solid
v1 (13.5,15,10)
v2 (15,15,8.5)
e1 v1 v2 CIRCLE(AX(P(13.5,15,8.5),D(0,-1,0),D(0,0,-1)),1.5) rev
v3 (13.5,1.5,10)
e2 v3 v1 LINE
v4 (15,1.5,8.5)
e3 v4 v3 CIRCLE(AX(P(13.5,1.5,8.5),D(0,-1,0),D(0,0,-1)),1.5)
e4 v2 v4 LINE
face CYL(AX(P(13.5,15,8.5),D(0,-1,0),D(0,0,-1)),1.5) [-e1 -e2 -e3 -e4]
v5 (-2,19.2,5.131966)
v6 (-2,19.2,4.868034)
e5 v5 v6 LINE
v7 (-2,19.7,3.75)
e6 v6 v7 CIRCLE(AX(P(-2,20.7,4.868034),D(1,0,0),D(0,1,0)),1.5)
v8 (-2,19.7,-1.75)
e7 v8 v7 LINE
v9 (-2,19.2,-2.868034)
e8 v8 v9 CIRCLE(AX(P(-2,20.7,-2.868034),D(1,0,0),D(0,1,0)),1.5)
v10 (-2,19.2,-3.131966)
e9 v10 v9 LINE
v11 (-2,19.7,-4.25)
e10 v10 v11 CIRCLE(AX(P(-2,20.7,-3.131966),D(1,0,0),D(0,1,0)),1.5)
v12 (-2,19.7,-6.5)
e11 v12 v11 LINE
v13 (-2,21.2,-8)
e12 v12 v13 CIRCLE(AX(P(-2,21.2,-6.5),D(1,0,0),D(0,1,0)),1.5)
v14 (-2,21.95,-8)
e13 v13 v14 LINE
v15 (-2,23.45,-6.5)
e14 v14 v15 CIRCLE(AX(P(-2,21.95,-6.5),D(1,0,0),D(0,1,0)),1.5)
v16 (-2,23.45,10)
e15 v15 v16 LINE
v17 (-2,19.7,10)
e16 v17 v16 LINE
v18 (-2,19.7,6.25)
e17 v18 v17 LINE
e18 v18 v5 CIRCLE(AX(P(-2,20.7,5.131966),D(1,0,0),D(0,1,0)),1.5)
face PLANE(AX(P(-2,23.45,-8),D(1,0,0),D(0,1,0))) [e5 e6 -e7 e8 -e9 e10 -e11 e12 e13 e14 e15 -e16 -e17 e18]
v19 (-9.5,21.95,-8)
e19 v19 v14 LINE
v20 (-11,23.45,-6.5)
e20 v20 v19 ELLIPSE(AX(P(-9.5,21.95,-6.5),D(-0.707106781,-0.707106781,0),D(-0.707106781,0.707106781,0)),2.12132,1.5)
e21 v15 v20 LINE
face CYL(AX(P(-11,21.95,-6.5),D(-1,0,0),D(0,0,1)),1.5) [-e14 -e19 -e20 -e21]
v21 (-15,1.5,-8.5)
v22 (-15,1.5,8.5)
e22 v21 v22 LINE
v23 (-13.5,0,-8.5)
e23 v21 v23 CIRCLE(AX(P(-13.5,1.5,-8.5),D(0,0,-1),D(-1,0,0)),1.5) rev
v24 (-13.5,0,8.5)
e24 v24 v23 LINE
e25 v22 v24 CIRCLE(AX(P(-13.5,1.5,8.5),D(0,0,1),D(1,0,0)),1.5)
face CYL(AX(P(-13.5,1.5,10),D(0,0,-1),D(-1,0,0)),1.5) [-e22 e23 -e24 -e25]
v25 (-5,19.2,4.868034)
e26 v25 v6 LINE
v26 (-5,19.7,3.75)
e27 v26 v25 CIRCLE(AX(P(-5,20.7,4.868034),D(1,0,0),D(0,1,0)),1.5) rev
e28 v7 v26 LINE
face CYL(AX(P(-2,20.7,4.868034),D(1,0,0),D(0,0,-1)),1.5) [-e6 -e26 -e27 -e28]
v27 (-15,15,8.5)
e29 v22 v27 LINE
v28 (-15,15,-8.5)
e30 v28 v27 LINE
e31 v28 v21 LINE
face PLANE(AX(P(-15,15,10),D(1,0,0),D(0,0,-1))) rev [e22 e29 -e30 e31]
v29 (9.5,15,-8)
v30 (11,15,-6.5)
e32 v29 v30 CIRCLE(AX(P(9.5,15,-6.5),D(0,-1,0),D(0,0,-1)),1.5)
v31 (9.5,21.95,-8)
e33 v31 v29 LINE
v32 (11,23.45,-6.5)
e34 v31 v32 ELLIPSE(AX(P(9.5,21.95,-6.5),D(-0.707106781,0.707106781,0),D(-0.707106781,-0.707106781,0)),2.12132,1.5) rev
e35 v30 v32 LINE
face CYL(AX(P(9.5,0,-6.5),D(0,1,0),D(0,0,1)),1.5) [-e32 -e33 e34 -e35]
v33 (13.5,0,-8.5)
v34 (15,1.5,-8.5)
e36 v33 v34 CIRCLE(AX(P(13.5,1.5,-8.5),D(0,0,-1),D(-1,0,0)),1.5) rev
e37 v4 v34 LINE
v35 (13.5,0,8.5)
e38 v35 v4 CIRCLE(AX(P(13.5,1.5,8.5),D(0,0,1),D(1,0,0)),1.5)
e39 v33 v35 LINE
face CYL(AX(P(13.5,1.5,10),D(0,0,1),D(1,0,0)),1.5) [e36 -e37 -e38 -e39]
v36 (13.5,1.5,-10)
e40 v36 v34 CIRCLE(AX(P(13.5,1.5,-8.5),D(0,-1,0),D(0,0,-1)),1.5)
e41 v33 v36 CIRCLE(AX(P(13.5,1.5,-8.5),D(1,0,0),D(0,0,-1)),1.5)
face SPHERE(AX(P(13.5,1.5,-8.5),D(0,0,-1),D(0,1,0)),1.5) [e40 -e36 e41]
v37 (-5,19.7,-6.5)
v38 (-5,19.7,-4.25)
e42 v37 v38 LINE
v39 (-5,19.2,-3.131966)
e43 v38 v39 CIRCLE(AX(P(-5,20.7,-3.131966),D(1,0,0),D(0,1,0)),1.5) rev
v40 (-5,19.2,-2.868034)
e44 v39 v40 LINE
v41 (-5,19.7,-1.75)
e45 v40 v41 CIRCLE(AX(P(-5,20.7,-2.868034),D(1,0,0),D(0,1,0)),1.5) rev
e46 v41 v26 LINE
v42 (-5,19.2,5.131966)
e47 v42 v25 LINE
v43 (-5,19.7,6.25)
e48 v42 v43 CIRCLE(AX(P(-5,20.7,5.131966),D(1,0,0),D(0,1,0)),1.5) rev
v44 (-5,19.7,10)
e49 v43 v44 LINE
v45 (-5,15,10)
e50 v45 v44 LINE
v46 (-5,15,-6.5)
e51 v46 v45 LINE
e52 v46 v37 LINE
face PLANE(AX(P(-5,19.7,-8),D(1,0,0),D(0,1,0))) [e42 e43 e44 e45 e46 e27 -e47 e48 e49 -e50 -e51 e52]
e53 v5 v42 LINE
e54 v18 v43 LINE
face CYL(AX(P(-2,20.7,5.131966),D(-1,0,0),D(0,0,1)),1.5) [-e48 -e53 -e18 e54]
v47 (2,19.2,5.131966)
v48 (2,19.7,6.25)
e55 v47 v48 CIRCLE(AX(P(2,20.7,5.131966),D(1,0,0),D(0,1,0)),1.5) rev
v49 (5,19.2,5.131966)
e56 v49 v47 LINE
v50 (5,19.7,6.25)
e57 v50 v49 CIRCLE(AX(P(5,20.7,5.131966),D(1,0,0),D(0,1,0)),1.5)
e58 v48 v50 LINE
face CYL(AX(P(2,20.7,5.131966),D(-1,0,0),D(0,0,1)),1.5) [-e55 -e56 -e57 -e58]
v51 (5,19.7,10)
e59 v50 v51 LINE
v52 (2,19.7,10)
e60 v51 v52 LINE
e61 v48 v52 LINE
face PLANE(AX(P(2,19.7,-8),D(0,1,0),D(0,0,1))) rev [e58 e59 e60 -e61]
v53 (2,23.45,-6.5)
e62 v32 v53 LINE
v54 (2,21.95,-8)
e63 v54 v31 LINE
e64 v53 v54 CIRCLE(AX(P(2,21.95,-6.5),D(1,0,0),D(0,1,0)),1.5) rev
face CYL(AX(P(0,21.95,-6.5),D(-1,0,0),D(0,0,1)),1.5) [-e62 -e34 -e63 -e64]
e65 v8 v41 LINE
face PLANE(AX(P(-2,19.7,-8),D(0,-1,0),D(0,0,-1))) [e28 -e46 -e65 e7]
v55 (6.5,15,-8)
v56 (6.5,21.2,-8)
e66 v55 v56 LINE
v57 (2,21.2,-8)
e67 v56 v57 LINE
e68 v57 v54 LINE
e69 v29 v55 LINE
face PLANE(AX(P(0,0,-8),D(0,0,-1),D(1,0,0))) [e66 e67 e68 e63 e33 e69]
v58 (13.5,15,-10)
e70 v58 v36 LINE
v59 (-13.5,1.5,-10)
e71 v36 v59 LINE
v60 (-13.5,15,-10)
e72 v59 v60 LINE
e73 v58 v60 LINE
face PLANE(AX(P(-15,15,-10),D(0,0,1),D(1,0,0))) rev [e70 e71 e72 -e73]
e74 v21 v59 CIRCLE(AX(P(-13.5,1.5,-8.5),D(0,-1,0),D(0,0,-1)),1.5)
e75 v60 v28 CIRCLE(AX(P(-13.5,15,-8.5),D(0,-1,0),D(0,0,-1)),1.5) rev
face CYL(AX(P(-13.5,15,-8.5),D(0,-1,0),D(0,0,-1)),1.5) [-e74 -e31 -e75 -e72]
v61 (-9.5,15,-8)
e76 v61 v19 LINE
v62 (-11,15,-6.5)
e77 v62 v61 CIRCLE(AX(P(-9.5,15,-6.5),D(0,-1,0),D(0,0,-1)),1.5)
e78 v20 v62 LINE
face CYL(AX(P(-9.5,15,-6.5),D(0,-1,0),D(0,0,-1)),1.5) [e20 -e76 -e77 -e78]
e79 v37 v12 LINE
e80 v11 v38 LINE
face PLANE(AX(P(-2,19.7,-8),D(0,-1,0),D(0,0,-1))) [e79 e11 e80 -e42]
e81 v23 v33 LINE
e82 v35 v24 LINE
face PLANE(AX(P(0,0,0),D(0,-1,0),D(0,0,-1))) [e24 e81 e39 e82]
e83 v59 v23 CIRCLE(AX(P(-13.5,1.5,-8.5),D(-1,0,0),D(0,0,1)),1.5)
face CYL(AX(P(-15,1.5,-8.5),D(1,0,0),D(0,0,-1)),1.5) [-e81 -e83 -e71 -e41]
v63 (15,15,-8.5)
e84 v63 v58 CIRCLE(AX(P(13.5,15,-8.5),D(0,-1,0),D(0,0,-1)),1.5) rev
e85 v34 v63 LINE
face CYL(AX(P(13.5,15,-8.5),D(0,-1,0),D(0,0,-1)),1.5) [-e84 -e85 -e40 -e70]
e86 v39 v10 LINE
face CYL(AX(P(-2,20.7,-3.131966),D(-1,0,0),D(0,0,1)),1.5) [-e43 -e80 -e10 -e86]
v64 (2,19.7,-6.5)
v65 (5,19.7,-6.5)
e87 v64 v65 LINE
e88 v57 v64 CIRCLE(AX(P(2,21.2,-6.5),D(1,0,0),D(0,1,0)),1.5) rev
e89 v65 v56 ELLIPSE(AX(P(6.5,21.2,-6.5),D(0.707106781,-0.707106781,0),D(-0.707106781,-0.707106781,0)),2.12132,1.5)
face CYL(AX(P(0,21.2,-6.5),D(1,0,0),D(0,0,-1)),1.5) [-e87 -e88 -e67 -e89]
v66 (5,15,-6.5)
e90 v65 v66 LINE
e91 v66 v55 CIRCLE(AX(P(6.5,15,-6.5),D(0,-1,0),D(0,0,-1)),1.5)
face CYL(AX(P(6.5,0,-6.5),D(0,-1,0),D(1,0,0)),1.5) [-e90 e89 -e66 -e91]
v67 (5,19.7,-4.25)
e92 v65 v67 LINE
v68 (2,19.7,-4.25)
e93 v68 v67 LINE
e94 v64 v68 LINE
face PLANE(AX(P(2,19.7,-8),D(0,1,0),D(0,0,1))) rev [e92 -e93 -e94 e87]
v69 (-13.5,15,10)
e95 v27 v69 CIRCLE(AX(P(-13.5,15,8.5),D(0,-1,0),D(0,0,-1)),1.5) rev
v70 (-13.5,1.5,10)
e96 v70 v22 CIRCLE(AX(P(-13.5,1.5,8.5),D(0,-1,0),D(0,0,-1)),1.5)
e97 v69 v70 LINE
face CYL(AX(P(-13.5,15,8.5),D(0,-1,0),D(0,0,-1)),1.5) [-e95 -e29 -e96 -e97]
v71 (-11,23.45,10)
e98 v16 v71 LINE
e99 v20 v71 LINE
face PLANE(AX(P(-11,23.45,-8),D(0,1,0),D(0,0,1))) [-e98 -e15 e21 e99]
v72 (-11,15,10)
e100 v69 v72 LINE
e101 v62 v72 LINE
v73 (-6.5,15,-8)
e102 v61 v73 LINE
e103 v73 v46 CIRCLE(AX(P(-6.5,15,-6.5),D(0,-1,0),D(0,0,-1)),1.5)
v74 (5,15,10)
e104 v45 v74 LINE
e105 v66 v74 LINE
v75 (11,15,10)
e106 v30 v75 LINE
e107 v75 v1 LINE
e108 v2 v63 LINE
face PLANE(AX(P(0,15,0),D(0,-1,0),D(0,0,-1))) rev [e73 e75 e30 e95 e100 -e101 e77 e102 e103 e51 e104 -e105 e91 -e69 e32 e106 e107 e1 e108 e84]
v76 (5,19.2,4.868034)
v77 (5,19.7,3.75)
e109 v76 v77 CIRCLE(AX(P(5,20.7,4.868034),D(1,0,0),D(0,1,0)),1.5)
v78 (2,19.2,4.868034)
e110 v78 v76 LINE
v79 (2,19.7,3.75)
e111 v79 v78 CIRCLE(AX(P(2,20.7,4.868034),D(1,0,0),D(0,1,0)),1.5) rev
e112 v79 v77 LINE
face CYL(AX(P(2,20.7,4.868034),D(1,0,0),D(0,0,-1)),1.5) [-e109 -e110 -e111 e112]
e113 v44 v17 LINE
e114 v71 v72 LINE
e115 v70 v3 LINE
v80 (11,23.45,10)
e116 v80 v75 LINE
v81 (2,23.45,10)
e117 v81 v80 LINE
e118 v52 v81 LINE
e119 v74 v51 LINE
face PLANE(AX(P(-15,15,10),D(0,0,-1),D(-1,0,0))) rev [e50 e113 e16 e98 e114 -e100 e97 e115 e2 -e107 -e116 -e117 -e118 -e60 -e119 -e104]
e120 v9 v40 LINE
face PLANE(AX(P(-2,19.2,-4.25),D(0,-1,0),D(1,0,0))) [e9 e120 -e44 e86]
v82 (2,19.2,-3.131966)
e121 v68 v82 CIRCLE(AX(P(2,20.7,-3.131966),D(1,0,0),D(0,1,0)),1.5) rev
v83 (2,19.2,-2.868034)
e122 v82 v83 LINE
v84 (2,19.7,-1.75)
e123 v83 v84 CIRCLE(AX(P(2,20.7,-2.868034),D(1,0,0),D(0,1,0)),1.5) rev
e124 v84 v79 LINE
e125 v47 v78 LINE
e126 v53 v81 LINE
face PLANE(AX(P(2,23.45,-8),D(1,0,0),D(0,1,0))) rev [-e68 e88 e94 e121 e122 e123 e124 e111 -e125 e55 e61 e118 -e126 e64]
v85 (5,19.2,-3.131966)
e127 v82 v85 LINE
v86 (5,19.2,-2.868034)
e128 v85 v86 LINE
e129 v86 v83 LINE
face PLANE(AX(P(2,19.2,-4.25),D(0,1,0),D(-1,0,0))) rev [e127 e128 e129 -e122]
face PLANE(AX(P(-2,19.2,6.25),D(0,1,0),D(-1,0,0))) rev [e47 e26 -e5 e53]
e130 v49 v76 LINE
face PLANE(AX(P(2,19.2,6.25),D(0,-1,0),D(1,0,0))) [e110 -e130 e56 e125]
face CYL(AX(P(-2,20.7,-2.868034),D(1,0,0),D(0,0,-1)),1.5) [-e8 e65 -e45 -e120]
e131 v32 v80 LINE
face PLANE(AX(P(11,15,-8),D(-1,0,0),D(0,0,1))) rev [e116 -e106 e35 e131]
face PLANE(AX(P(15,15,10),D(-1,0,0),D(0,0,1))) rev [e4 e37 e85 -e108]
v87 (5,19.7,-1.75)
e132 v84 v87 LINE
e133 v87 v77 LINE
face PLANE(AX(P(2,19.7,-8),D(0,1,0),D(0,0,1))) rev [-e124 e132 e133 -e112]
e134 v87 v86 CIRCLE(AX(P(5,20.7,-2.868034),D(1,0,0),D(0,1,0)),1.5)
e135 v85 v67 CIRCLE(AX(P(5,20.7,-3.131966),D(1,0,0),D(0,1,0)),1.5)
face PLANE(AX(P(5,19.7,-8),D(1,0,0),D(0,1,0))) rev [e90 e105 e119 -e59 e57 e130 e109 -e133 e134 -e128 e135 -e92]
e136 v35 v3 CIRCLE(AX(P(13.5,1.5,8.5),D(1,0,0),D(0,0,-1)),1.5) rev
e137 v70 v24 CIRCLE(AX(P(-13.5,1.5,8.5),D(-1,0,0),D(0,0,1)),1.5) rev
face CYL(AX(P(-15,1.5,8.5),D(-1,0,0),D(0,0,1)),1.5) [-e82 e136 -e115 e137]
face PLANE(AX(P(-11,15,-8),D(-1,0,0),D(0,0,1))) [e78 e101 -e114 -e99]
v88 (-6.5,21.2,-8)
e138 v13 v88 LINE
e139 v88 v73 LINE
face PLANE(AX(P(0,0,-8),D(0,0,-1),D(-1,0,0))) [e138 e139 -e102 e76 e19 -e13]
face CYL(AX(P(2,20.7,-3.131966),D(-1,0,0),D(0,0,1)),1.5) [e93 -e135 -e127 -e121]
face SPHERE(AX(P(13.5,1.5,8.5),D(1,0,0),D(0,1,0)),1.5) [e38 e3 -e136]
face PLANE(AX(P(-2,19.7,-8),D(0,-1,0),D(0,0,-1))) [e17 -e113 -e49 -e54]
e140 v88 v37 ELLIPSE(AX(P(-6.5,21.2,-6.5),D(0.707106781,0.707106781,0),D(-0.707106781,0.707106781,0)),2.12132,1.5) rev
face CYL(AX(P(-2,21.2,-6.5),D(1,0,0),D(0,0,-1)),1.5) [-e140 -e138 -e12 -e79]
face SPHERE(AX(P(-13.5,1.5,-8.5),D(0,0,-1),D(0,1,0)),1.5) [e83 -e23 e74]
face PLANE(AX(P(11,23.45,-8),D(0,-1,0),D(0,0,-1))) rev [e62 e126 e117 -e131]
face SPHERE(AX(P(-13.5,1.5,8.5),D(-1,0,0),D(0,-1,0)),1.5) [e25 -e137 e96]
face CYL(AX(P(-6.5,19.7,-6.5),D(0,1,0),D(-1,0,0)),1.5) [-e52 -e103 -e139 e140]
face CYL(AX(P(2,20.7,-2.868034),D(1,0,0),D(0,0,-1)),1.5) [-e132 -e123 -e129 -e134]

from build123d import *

# Parameters (mm, degrees)
SKETCH1_W            = 30
SKETCH1_H            = 20
BOSS_EXTRUDE1_DEPTH  = 15
BOSS_EXTRUDE2_DEPTH  = 18
SKETCH3_W            = 2.5
SKETCH3_H            = 0.5
BOSS_EXTRUDE3_DEPTH  = 3
FILLET1_R            = 1.5
FILLET1_OF_MIRROR1_R = 1.5
MIRROR2_START        = 5
MIRROR2_OUTLINE_W    = 8.45
MIRROR2_OUTLINE_H    = 18
MIRROR2_DEPTH        = 6
MIRROR2_START_2      = 2
MIRROR2_2_DEPTH      = 3
FILLET2_R            = 1.5


# Read off the part's stored shape, not the designer's step: Mirror2
with BuildPart() as part:
    # Sketch1 → Boss-Extrude1 (new body)
    with BuildSketch(Plane(origin=(0, 0, 0), x_dir=(1, 0, 0), z_dir=(0, 1, 0))):
        Rectangle(SKETCH1_W, SKETCH1_H)
    extrude(amount=BOSS_EXTRUDE1_DEPTH)

    # Sketch2 → Boss-Extrude2 (add)
    with BuildSketch(Plane.XY.offset(10)):
        Polygon((-11, 15), (-11, 23.45), (-2, 23.45), (-2, 19.7), (-5, 19.7), (-5, 15), align=None)
    extrude(amount=-BOSS_EXTRUDE2_DEPTH)

    # Sketch3 → Boss-Extrude3 (add)
    with BuildSketch(Plane(origin=(-5, 0, 0), x_dir=(0, 0, -1), z_dir=(1, 0, 0))):
        with Locations((-5, 19.45)):
            Rectangle(SKETCH3_W, SKETCH3_H)
    boss_extrude3 = extrude(amount=BOSS_EXTRUDE3_DEPTH)

    # Fillet1
    # the kernel refuses this fillet: 1.5 mm, written as the material it takes off along each edge
    with BuildSketch(Plane(origin=(-5, 19.2, 3.75), x_dir=(0, 1, 0), z_dir=(1, 0, 0))) as fillet1_piece_1:
        with BuildLine():
            CenterArc((1.5, 1.118033989), FILLET1_R, 180, 48.189685104)
            Line((0, 1.118033989), (-0.03, 1.118033989))
            Line((-0.03, 1.118033989), (-0.03, 0))
            Line((-0.03, 0), (0, -0.03))
            ThreePointArc((0, -0.03), (0.25, -0.03), (0.48, -0.02236068))
            Line((0.48, -0.02236068), (0.5, 0))
        make_face()
    extrude(amount=5.795084972, mode=Mode.SUBTRACT)
    with BuildSketch(Plane(origin=(-5, 19.2, 6.25), x_dir=(0, 1, 0), z_dir=(1, 0, 0))) as fillet1_piece_2:
        with BuildLine():
            CenterArc((1.5, -1.118033989), FILLET1_R, 131.810314896, 48.189685104)
            Line((0, -1.118033989), (-0.03, -1.118033989))
            Line((-0.03, -1.118033989), (-0.03, 0))
            Line((-0.03, 0), (0, 0.03))
            ThreePointArc((0, 0.03), (0.25, 0.03), (0.48, 0.02236068))
            Line((0.48, 0.02236068), (0.5, 0))
        make_face()
    extrude(amount=5.795084972, mode=Mode.SUBTRACT)

    # Mirror1: Boss-Extrude3 across plane
    add(boss_extrude3.mirror(Plane(origin=(0, 0, 1), x_dir=(1, 0, 0), z_dir=(0, 0, -1))))

    # Fillet1 of Mirror1
    # the kernel refuses this fillet: 1.5 mm, written as the material it takes off along each edge
    with BuildSketch(Plane(origin=(-5, 19.2, -1.75), x_dir=(0, 0, -1), z_dir=(1, 0, 0))) as fillet1_of_mirror1_piece_1:
        with BuildLine():
            CenterArc((1.118033989, 1.5), FILLET1_OF_MIRROR1_R, 221.810314896, 48.189685104)
            Line((0, 0.5), (-0.02236068, 0.48))
            ThreePointArc((-0.02236068, 0.48), (-0.03, 0.25), (-0.03, 0))
            Line((-0.03, 0), (0, -0.03))
            Line((0, -0.03), (1.118033989, -0.03))
            Line((1.118033989, -0.03), (1.118033989, 0))
        make_face()
    extrude(amount=5.795084972, mode=Mode.SUBTRACT)
    with BuildSketch(Plane(origin=(-5, 19.2, -4.25), x_dir=(0, 1, 0), z_dir=(1, 0, 0))) as fillet1_of_mirror1_piece_2:
        with BuildLine():
            CenterArc((1.5, 1.118033989), FILLET1_OF_MIRROR1_R, 180, 48.189685104)
            Line((0, 1.118033989), (-0.03, 1.118033989))
            Line((-0.03, 1.118033989), (-0.03, 0))
            Line((-0.03, 0), (0, -0.03))
            ThreePointArc((0, -0.03), (0.25, -0.03), (0.48, -0.02236068))
            Line((0.48, -0.02236068), (0.5, 0))
        make_face()
    extrude(amount=5.795084972, mode=Mode.SUBTRACT)

    # Mirror2 outline → Mirror2 (add)
    with BuildSketch(Plane.YZ.offset(MIRROR2_START)):
        with Locations((19.225, 1)):
            Rectangle(MIRROR2_OUTLINE_W, MIRROR2_OUTLINE_H)
    extrude(amount=MIRROR2_DEPTH)

    # Mirror2 2 outline → Mirror2 2 (add)
    with BuildSketch(Plane.YZ.offset(MIRROR2_START_2)):
        with BuildLine():
            Line((19.7, -4.25), (19.7, -8))
            Line((19.7, -8), (23.45, -8))
            Line((23.45, -8), (23.45, 10))
            Line((23.45, 10), (19.7, 10))
            Line((19.7, 10), (19.7, 6.25))
            ThreePointArc((19.7, 6.25), (19.330693606, 5.744338447), (19.2, 5.131966011))
            Line((19.2, 5.131966011), (19.2, 4.868033989))
            ThreePointArc((19.2, 4.868033989), (19.330693606, 4.255661553), (19.7, 3.75))
            Line((19.7, 3.75), (19.7, -1.75))
            ThreePointArc((19.7, -1.75), (19.330693606, -2.255661553), (19.2, -2.868033989))
            Line((19.2, -2.868033989), (19.2, -3.131966011))
            ThreePointArc((19.2, -3.131966011), (19.330693606, -3.744338447), (19.7, -4.25))
        make_face()
    extrude(amount=MIRROR2_2_DEPTH)

    # Fillet2
    fillet2_edges = [part.edges().sort_by_distance(p)[0] for p in [
        (-11, 19.225, -8),
        (-6.5, 23.45, -8),
        (-3.5, 19.7, -8),
        (-5, 17.35, -8),
        (0, 0, -10),
        (15, 0, 0),
        (0, 0, 10),
        (-15, 0, 0),
        (-15, 7.5, -10),
        (15, 7.5, -10),
        (15, 7.5, 10),
        (-15, 7.5, 10),
        (5, 17.35, -8),
        (3.5, 19.7, -8),
        (6.5, 23.45, -8),
        (11, 19.225, -8),
    ]]
    fillet(fillet2_edges, radius=FILLET2_R)


solid = part.part
